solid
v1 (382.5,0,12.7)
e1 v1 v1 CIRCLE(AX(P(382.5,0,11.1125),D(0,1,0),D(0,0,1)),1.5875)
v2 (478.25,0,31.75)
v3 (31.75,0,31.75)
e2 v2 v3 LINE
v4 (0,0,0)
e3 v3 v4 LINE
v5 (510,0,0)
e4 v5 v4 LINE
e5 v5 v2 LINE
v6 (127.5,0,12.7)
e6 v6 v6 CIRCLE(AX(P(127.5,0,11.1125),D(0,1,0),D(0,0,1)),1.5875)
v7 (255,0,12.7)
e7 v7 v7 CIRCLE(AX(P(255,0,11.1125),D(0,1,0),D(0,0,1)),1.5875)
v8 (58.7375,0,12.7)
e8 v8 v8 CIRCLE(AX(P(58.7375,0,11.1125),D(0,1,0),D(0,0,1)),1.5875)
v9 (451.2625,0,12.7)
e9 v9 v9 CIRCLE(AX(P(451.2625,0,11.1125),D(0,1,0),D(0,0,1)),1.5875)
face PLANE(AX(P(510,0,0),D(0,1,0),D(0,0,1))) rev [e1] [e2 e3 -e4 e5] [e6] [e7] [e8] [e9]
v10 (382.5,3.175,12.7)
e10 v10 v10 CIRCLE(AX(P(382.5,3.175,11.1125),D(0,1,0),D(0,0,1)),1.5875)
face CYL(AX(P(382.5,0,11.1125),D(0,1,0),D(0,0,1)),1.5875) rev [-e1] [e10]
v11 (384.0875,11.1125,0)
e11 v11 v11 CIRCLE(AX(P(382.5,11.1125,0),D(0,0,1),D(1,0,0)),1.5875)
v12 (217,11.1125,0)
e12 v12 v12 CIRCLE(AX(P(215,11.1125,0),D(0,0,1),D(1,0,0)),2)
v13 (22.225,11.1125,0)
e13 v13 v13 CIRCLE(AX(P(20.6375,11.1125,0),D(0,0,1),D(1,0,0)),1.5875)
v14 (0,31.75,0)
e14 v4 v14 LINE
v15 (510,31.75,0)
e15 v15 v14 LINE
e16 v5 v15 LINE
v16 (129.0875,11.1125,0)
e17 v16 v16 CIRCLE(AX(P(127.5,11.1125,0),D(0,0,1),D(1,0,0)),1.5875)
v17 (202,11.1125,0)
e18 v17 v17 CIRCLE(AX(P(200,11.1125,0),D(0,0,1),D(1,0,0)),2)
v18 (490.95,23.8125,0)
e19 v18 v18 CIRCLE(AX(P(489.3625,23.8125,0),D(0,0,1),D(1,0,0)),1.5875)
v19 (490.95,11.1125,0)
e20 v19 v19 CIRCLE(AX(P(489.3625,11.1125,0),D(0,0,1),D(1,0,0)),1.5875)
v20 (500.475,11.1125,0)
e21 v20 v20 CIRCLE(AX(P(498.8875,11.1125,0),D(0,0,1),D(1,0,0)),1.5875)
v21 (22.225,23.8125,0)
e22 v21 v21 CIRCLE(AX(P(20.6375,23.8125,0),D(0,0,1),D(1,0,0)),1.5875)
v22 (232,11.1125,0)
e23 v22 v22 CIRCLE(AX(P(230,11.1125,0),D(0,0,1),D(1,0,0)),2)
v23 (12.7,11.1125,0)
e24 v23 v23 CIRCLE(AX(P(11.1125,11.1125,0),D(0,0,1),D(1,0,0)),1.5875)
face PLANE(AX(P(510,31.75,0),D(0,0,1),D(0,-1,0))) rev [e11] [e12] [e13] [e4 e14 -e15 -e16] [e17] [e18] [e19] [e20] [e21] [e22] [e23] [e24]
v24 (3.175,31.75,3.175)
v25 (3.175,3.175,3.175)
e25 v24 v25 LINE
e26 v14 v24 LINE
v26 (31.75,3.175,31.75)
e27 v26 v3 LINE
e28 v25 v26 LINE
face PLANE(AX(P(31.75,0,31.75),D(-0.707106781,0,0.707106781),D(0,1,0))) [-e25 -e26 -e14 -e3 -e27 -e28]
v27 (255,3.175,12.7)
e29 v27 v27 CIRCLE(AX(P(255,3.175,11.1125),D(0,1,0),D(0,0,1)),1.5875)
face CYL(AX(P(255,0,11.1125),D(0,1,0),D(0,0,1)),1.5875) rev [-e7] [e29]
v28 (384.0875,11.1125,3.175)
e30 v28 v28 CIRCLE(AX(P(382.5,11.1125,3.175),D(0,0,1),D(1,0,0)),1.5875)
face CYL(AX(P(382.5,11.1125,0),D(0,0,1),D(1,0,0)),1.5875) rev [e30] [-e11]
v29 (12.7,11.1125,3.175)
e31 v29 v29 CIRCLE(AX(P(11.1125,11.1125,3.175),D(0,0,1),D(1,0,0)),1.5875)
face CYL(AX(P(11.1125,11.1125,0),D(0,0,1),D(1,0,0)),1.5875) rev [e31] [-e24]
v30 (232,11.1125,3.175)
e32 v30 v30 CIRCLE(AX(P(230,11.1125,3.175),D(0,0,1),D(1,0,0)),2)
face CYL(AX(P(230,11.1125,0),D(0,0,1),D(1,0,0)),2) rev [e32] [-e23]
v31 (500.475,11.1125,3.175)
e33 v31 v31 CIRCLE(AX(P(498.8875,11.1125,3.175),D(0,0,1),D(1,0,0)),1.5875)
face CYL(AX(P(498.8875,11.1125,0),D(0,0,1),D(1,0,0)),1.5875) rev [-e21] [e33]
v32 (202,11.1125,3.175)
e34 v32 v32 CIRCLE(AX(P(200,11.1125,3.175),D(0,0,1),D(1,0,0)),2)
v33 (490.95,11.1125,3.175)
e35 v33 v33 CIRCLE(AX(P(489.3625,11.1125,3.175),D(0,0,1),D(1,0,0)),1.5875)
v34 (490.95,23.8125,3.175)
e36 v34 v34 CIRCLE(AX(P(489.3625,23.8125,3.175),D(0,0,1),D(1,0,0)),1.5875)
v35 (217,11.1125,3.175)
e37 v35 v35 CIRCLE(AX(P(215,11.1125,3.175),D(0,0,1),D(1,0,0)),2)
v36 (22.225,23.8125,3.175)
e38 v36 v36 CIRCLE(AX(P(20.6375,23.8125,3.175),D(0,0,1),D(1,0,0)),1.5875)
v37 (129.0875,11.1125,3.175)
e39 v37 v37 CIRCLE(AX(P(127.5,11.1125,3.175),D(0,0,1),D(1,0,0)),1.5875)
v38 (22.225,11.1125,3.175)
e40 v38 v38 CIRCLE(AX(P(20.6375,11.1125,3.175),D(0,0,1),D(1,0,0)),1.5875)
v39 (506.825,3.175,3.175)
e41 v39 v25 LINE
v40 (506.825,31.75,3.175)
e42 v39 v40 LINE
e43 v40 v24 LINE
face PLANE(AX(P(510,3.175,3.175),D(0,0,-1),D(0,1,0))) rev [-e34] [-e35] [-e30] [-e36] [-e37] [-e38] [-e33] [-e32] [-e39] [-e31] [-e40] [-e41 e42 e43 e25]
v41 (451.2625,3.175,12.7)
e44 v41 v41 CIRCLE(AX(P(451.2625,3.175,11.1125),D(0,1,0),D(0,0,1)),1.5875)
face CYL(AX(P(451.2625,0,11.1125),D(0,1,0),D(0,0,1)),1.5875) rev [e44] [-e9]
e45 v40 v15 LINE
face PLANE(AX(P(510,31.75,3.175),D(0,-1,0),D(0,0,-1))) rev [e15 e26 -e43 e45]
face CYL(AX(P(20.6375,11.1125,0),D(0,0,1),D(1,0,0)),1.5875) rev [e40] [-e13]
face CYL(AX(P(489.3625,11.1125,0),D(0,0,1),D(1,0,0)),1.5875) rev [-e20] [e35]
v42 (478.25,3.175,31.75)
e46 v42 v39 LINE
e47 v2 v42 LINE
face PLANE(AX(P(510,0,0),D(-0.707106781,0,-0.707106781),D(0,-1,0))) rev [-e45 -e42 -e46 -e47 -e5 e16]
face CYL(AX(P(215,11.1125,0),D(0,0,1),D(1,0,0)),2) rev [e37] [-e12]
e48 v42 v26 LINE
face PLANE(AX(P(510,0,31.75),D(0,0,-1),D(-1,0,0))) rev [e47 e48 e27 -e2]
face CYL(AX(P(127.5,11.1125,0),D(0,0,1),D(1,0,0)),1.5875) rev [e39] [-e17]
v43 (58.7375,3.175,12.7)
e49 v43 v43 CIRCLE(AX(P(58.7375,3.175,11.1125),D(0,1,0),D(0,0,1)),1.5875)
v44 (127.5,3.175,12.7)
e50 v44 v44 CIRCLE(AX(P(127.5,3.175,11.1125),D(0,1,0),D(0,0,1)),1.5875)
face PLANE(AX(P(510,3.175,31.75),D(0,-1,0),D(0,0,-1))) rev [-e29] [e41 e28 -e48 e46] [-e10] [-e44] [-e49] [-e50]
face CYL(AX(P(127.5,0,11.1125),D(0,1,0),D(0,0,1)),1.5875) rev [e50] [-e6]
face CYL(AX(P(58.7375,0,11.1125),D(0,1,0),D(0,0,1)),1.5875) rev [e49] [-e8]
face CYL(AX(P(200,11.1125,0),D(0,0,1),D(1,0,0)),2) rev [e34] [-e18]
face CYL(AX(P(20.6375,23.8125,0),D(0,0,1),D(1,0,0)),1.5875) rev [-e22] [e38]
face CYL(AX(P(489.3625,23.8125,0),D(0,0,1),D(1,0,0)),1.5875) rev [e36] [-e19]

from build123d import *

# Parameters (mm, degrees)
BOSS_EXTRUDE1_DEPTH          = 510
CHAMFER6_SIZE                = 31.75
CHAMFER7_SIZE                = 31.75
TOPHOLES_SKETCH3_R           = 1.5875
TOPHOLES_CUT_EXTRUDE2_DEPTH  = 512.785690622
BACKHOLES_SKETCH4_R          = 1.5875
BACKHOLES_SKETCH4_R_2        = 2
BACKHOLES_CUT_EXTRUDE3_DEPTH = 512.785690622


with BuildPart() as part:
    # Sketch1 → Boss-Extrude1 (new body)
    with BuildSketch(Plane(origin=(0, 0, 0), x_dir=(0, 0, -1), z_dir=(1, 0, 0))):
        Polygon((0, 0), (-31.75, 0), (-31.75, 3.175), (-3.175, 3.175), (-3.175, 31.75), (0, 31.75), align=None)
    extrude(amount=BOSS_EXTRUDE1_DEPTH)

    # Chamfer6
    chamfer6_edges = [part.edges().sort_by_distance(p)[0] for p in [
        (510, 1.5875, 31.75),
    ]]
    chamfer(chamfer6_edges, length=CHAMFER6_SIZE - 0.0001)  # a hair under: the kernel refuses the full size

    # Chamfer7
    chamfer7_edges = [part.edges().sort_by_distance(p)[0] for p in [
        (0, 1.5875, 31.75),
    ]]
    chamfer(chamfer7_edges, length=CHAMFER7_SIZE - 0.0001)  # a hair under: the kernel refuses the full size

    # TopHoles-Sketch3 → TopHoles-Cut-Extrude2 (cut, through all)
    with BuildSketch(Plane(origin=(0, 3.175, 0), x_dir=(1, 0, 0), z_dir=(0, 1, 0))):
        with Locations(Location((451.2625, -11.1125, 0), (0, 0, 270))):
            Circle(TOPHOLES_SKETCH3_R)
        with Locations(Location((58.7375, -11.1125, 0), (0, 0, 270))):
            Circle(TOPHOLES_SKETCH3_R)
        with Locations(Location((127.5, -11.1125, 0), (0, 0, 270))):
            Circle(TOPHOLES_SKETCH3_R)
        with Locations(Location((255, -11.1125, 0), (0, 0, 270))):
            Circle(TOPHOLES_SKETCH3_R)
        with Locations(Location((382.5, -11.1125, 0), (0, 0, 270))):
            Circle(TOPHOLES_SKETCH3_R)
    extrude(amount=-TOPHOLES_CUT_EXTRUDE2_DEPTH, mode=Mode.SUBTRACT)

    # BackHoles-Sketch4 → BackHoles-Cut-Extrude3 (cut, through all)
    with BuildSketch(Plane.XY.offset(3.175)):
        with Locations((489.3625, 23.8125)):
            Circle(BACKHOLES_SKETCH4_R)
        with Locations((20.6375, 23.8125)):
            Circle(BACKHOLES_SKETCH4_R)
        with Locations((11.1125, 11.1125)):
            Circle(BACKHOLES_SKETCH4_R)
        with Locations((20.6375, 11.1125)):
            Circle(BACKHOLES_SKETCH4_R)
        with Locations((489.3625, 11.1125)):
            Circle(BACKHOLES_SKETCH4_R)
        with Locations((498.8875, 11.1125)):
            Circle(BACKHOLES_SKETCH4_R)
        with Locations((200, 11.1125)):
            Circle(BACKHOLES_SKETCH4_R_2)
        with Locations((215, 11.1125)):
            Circle(BACKHOLES_SKETCH4_R_2)
        with Locations((230, 11.1125)):
            Circle(BACKHOLES_SKETCH4_R_2)
        with Locations((127.5, 11.1125)):
            Circle(BACKHOLES_SKETCH4_R)
        with Locations((382.5, 11.1125)):
            Circle(BACKHOLES_SKETCH4_R)
    extrude(amount=-BACKHOLES_CUT_EXTRUDE3_DEPTH, mode=Mode.SUBTRACT)


solid = part.part
